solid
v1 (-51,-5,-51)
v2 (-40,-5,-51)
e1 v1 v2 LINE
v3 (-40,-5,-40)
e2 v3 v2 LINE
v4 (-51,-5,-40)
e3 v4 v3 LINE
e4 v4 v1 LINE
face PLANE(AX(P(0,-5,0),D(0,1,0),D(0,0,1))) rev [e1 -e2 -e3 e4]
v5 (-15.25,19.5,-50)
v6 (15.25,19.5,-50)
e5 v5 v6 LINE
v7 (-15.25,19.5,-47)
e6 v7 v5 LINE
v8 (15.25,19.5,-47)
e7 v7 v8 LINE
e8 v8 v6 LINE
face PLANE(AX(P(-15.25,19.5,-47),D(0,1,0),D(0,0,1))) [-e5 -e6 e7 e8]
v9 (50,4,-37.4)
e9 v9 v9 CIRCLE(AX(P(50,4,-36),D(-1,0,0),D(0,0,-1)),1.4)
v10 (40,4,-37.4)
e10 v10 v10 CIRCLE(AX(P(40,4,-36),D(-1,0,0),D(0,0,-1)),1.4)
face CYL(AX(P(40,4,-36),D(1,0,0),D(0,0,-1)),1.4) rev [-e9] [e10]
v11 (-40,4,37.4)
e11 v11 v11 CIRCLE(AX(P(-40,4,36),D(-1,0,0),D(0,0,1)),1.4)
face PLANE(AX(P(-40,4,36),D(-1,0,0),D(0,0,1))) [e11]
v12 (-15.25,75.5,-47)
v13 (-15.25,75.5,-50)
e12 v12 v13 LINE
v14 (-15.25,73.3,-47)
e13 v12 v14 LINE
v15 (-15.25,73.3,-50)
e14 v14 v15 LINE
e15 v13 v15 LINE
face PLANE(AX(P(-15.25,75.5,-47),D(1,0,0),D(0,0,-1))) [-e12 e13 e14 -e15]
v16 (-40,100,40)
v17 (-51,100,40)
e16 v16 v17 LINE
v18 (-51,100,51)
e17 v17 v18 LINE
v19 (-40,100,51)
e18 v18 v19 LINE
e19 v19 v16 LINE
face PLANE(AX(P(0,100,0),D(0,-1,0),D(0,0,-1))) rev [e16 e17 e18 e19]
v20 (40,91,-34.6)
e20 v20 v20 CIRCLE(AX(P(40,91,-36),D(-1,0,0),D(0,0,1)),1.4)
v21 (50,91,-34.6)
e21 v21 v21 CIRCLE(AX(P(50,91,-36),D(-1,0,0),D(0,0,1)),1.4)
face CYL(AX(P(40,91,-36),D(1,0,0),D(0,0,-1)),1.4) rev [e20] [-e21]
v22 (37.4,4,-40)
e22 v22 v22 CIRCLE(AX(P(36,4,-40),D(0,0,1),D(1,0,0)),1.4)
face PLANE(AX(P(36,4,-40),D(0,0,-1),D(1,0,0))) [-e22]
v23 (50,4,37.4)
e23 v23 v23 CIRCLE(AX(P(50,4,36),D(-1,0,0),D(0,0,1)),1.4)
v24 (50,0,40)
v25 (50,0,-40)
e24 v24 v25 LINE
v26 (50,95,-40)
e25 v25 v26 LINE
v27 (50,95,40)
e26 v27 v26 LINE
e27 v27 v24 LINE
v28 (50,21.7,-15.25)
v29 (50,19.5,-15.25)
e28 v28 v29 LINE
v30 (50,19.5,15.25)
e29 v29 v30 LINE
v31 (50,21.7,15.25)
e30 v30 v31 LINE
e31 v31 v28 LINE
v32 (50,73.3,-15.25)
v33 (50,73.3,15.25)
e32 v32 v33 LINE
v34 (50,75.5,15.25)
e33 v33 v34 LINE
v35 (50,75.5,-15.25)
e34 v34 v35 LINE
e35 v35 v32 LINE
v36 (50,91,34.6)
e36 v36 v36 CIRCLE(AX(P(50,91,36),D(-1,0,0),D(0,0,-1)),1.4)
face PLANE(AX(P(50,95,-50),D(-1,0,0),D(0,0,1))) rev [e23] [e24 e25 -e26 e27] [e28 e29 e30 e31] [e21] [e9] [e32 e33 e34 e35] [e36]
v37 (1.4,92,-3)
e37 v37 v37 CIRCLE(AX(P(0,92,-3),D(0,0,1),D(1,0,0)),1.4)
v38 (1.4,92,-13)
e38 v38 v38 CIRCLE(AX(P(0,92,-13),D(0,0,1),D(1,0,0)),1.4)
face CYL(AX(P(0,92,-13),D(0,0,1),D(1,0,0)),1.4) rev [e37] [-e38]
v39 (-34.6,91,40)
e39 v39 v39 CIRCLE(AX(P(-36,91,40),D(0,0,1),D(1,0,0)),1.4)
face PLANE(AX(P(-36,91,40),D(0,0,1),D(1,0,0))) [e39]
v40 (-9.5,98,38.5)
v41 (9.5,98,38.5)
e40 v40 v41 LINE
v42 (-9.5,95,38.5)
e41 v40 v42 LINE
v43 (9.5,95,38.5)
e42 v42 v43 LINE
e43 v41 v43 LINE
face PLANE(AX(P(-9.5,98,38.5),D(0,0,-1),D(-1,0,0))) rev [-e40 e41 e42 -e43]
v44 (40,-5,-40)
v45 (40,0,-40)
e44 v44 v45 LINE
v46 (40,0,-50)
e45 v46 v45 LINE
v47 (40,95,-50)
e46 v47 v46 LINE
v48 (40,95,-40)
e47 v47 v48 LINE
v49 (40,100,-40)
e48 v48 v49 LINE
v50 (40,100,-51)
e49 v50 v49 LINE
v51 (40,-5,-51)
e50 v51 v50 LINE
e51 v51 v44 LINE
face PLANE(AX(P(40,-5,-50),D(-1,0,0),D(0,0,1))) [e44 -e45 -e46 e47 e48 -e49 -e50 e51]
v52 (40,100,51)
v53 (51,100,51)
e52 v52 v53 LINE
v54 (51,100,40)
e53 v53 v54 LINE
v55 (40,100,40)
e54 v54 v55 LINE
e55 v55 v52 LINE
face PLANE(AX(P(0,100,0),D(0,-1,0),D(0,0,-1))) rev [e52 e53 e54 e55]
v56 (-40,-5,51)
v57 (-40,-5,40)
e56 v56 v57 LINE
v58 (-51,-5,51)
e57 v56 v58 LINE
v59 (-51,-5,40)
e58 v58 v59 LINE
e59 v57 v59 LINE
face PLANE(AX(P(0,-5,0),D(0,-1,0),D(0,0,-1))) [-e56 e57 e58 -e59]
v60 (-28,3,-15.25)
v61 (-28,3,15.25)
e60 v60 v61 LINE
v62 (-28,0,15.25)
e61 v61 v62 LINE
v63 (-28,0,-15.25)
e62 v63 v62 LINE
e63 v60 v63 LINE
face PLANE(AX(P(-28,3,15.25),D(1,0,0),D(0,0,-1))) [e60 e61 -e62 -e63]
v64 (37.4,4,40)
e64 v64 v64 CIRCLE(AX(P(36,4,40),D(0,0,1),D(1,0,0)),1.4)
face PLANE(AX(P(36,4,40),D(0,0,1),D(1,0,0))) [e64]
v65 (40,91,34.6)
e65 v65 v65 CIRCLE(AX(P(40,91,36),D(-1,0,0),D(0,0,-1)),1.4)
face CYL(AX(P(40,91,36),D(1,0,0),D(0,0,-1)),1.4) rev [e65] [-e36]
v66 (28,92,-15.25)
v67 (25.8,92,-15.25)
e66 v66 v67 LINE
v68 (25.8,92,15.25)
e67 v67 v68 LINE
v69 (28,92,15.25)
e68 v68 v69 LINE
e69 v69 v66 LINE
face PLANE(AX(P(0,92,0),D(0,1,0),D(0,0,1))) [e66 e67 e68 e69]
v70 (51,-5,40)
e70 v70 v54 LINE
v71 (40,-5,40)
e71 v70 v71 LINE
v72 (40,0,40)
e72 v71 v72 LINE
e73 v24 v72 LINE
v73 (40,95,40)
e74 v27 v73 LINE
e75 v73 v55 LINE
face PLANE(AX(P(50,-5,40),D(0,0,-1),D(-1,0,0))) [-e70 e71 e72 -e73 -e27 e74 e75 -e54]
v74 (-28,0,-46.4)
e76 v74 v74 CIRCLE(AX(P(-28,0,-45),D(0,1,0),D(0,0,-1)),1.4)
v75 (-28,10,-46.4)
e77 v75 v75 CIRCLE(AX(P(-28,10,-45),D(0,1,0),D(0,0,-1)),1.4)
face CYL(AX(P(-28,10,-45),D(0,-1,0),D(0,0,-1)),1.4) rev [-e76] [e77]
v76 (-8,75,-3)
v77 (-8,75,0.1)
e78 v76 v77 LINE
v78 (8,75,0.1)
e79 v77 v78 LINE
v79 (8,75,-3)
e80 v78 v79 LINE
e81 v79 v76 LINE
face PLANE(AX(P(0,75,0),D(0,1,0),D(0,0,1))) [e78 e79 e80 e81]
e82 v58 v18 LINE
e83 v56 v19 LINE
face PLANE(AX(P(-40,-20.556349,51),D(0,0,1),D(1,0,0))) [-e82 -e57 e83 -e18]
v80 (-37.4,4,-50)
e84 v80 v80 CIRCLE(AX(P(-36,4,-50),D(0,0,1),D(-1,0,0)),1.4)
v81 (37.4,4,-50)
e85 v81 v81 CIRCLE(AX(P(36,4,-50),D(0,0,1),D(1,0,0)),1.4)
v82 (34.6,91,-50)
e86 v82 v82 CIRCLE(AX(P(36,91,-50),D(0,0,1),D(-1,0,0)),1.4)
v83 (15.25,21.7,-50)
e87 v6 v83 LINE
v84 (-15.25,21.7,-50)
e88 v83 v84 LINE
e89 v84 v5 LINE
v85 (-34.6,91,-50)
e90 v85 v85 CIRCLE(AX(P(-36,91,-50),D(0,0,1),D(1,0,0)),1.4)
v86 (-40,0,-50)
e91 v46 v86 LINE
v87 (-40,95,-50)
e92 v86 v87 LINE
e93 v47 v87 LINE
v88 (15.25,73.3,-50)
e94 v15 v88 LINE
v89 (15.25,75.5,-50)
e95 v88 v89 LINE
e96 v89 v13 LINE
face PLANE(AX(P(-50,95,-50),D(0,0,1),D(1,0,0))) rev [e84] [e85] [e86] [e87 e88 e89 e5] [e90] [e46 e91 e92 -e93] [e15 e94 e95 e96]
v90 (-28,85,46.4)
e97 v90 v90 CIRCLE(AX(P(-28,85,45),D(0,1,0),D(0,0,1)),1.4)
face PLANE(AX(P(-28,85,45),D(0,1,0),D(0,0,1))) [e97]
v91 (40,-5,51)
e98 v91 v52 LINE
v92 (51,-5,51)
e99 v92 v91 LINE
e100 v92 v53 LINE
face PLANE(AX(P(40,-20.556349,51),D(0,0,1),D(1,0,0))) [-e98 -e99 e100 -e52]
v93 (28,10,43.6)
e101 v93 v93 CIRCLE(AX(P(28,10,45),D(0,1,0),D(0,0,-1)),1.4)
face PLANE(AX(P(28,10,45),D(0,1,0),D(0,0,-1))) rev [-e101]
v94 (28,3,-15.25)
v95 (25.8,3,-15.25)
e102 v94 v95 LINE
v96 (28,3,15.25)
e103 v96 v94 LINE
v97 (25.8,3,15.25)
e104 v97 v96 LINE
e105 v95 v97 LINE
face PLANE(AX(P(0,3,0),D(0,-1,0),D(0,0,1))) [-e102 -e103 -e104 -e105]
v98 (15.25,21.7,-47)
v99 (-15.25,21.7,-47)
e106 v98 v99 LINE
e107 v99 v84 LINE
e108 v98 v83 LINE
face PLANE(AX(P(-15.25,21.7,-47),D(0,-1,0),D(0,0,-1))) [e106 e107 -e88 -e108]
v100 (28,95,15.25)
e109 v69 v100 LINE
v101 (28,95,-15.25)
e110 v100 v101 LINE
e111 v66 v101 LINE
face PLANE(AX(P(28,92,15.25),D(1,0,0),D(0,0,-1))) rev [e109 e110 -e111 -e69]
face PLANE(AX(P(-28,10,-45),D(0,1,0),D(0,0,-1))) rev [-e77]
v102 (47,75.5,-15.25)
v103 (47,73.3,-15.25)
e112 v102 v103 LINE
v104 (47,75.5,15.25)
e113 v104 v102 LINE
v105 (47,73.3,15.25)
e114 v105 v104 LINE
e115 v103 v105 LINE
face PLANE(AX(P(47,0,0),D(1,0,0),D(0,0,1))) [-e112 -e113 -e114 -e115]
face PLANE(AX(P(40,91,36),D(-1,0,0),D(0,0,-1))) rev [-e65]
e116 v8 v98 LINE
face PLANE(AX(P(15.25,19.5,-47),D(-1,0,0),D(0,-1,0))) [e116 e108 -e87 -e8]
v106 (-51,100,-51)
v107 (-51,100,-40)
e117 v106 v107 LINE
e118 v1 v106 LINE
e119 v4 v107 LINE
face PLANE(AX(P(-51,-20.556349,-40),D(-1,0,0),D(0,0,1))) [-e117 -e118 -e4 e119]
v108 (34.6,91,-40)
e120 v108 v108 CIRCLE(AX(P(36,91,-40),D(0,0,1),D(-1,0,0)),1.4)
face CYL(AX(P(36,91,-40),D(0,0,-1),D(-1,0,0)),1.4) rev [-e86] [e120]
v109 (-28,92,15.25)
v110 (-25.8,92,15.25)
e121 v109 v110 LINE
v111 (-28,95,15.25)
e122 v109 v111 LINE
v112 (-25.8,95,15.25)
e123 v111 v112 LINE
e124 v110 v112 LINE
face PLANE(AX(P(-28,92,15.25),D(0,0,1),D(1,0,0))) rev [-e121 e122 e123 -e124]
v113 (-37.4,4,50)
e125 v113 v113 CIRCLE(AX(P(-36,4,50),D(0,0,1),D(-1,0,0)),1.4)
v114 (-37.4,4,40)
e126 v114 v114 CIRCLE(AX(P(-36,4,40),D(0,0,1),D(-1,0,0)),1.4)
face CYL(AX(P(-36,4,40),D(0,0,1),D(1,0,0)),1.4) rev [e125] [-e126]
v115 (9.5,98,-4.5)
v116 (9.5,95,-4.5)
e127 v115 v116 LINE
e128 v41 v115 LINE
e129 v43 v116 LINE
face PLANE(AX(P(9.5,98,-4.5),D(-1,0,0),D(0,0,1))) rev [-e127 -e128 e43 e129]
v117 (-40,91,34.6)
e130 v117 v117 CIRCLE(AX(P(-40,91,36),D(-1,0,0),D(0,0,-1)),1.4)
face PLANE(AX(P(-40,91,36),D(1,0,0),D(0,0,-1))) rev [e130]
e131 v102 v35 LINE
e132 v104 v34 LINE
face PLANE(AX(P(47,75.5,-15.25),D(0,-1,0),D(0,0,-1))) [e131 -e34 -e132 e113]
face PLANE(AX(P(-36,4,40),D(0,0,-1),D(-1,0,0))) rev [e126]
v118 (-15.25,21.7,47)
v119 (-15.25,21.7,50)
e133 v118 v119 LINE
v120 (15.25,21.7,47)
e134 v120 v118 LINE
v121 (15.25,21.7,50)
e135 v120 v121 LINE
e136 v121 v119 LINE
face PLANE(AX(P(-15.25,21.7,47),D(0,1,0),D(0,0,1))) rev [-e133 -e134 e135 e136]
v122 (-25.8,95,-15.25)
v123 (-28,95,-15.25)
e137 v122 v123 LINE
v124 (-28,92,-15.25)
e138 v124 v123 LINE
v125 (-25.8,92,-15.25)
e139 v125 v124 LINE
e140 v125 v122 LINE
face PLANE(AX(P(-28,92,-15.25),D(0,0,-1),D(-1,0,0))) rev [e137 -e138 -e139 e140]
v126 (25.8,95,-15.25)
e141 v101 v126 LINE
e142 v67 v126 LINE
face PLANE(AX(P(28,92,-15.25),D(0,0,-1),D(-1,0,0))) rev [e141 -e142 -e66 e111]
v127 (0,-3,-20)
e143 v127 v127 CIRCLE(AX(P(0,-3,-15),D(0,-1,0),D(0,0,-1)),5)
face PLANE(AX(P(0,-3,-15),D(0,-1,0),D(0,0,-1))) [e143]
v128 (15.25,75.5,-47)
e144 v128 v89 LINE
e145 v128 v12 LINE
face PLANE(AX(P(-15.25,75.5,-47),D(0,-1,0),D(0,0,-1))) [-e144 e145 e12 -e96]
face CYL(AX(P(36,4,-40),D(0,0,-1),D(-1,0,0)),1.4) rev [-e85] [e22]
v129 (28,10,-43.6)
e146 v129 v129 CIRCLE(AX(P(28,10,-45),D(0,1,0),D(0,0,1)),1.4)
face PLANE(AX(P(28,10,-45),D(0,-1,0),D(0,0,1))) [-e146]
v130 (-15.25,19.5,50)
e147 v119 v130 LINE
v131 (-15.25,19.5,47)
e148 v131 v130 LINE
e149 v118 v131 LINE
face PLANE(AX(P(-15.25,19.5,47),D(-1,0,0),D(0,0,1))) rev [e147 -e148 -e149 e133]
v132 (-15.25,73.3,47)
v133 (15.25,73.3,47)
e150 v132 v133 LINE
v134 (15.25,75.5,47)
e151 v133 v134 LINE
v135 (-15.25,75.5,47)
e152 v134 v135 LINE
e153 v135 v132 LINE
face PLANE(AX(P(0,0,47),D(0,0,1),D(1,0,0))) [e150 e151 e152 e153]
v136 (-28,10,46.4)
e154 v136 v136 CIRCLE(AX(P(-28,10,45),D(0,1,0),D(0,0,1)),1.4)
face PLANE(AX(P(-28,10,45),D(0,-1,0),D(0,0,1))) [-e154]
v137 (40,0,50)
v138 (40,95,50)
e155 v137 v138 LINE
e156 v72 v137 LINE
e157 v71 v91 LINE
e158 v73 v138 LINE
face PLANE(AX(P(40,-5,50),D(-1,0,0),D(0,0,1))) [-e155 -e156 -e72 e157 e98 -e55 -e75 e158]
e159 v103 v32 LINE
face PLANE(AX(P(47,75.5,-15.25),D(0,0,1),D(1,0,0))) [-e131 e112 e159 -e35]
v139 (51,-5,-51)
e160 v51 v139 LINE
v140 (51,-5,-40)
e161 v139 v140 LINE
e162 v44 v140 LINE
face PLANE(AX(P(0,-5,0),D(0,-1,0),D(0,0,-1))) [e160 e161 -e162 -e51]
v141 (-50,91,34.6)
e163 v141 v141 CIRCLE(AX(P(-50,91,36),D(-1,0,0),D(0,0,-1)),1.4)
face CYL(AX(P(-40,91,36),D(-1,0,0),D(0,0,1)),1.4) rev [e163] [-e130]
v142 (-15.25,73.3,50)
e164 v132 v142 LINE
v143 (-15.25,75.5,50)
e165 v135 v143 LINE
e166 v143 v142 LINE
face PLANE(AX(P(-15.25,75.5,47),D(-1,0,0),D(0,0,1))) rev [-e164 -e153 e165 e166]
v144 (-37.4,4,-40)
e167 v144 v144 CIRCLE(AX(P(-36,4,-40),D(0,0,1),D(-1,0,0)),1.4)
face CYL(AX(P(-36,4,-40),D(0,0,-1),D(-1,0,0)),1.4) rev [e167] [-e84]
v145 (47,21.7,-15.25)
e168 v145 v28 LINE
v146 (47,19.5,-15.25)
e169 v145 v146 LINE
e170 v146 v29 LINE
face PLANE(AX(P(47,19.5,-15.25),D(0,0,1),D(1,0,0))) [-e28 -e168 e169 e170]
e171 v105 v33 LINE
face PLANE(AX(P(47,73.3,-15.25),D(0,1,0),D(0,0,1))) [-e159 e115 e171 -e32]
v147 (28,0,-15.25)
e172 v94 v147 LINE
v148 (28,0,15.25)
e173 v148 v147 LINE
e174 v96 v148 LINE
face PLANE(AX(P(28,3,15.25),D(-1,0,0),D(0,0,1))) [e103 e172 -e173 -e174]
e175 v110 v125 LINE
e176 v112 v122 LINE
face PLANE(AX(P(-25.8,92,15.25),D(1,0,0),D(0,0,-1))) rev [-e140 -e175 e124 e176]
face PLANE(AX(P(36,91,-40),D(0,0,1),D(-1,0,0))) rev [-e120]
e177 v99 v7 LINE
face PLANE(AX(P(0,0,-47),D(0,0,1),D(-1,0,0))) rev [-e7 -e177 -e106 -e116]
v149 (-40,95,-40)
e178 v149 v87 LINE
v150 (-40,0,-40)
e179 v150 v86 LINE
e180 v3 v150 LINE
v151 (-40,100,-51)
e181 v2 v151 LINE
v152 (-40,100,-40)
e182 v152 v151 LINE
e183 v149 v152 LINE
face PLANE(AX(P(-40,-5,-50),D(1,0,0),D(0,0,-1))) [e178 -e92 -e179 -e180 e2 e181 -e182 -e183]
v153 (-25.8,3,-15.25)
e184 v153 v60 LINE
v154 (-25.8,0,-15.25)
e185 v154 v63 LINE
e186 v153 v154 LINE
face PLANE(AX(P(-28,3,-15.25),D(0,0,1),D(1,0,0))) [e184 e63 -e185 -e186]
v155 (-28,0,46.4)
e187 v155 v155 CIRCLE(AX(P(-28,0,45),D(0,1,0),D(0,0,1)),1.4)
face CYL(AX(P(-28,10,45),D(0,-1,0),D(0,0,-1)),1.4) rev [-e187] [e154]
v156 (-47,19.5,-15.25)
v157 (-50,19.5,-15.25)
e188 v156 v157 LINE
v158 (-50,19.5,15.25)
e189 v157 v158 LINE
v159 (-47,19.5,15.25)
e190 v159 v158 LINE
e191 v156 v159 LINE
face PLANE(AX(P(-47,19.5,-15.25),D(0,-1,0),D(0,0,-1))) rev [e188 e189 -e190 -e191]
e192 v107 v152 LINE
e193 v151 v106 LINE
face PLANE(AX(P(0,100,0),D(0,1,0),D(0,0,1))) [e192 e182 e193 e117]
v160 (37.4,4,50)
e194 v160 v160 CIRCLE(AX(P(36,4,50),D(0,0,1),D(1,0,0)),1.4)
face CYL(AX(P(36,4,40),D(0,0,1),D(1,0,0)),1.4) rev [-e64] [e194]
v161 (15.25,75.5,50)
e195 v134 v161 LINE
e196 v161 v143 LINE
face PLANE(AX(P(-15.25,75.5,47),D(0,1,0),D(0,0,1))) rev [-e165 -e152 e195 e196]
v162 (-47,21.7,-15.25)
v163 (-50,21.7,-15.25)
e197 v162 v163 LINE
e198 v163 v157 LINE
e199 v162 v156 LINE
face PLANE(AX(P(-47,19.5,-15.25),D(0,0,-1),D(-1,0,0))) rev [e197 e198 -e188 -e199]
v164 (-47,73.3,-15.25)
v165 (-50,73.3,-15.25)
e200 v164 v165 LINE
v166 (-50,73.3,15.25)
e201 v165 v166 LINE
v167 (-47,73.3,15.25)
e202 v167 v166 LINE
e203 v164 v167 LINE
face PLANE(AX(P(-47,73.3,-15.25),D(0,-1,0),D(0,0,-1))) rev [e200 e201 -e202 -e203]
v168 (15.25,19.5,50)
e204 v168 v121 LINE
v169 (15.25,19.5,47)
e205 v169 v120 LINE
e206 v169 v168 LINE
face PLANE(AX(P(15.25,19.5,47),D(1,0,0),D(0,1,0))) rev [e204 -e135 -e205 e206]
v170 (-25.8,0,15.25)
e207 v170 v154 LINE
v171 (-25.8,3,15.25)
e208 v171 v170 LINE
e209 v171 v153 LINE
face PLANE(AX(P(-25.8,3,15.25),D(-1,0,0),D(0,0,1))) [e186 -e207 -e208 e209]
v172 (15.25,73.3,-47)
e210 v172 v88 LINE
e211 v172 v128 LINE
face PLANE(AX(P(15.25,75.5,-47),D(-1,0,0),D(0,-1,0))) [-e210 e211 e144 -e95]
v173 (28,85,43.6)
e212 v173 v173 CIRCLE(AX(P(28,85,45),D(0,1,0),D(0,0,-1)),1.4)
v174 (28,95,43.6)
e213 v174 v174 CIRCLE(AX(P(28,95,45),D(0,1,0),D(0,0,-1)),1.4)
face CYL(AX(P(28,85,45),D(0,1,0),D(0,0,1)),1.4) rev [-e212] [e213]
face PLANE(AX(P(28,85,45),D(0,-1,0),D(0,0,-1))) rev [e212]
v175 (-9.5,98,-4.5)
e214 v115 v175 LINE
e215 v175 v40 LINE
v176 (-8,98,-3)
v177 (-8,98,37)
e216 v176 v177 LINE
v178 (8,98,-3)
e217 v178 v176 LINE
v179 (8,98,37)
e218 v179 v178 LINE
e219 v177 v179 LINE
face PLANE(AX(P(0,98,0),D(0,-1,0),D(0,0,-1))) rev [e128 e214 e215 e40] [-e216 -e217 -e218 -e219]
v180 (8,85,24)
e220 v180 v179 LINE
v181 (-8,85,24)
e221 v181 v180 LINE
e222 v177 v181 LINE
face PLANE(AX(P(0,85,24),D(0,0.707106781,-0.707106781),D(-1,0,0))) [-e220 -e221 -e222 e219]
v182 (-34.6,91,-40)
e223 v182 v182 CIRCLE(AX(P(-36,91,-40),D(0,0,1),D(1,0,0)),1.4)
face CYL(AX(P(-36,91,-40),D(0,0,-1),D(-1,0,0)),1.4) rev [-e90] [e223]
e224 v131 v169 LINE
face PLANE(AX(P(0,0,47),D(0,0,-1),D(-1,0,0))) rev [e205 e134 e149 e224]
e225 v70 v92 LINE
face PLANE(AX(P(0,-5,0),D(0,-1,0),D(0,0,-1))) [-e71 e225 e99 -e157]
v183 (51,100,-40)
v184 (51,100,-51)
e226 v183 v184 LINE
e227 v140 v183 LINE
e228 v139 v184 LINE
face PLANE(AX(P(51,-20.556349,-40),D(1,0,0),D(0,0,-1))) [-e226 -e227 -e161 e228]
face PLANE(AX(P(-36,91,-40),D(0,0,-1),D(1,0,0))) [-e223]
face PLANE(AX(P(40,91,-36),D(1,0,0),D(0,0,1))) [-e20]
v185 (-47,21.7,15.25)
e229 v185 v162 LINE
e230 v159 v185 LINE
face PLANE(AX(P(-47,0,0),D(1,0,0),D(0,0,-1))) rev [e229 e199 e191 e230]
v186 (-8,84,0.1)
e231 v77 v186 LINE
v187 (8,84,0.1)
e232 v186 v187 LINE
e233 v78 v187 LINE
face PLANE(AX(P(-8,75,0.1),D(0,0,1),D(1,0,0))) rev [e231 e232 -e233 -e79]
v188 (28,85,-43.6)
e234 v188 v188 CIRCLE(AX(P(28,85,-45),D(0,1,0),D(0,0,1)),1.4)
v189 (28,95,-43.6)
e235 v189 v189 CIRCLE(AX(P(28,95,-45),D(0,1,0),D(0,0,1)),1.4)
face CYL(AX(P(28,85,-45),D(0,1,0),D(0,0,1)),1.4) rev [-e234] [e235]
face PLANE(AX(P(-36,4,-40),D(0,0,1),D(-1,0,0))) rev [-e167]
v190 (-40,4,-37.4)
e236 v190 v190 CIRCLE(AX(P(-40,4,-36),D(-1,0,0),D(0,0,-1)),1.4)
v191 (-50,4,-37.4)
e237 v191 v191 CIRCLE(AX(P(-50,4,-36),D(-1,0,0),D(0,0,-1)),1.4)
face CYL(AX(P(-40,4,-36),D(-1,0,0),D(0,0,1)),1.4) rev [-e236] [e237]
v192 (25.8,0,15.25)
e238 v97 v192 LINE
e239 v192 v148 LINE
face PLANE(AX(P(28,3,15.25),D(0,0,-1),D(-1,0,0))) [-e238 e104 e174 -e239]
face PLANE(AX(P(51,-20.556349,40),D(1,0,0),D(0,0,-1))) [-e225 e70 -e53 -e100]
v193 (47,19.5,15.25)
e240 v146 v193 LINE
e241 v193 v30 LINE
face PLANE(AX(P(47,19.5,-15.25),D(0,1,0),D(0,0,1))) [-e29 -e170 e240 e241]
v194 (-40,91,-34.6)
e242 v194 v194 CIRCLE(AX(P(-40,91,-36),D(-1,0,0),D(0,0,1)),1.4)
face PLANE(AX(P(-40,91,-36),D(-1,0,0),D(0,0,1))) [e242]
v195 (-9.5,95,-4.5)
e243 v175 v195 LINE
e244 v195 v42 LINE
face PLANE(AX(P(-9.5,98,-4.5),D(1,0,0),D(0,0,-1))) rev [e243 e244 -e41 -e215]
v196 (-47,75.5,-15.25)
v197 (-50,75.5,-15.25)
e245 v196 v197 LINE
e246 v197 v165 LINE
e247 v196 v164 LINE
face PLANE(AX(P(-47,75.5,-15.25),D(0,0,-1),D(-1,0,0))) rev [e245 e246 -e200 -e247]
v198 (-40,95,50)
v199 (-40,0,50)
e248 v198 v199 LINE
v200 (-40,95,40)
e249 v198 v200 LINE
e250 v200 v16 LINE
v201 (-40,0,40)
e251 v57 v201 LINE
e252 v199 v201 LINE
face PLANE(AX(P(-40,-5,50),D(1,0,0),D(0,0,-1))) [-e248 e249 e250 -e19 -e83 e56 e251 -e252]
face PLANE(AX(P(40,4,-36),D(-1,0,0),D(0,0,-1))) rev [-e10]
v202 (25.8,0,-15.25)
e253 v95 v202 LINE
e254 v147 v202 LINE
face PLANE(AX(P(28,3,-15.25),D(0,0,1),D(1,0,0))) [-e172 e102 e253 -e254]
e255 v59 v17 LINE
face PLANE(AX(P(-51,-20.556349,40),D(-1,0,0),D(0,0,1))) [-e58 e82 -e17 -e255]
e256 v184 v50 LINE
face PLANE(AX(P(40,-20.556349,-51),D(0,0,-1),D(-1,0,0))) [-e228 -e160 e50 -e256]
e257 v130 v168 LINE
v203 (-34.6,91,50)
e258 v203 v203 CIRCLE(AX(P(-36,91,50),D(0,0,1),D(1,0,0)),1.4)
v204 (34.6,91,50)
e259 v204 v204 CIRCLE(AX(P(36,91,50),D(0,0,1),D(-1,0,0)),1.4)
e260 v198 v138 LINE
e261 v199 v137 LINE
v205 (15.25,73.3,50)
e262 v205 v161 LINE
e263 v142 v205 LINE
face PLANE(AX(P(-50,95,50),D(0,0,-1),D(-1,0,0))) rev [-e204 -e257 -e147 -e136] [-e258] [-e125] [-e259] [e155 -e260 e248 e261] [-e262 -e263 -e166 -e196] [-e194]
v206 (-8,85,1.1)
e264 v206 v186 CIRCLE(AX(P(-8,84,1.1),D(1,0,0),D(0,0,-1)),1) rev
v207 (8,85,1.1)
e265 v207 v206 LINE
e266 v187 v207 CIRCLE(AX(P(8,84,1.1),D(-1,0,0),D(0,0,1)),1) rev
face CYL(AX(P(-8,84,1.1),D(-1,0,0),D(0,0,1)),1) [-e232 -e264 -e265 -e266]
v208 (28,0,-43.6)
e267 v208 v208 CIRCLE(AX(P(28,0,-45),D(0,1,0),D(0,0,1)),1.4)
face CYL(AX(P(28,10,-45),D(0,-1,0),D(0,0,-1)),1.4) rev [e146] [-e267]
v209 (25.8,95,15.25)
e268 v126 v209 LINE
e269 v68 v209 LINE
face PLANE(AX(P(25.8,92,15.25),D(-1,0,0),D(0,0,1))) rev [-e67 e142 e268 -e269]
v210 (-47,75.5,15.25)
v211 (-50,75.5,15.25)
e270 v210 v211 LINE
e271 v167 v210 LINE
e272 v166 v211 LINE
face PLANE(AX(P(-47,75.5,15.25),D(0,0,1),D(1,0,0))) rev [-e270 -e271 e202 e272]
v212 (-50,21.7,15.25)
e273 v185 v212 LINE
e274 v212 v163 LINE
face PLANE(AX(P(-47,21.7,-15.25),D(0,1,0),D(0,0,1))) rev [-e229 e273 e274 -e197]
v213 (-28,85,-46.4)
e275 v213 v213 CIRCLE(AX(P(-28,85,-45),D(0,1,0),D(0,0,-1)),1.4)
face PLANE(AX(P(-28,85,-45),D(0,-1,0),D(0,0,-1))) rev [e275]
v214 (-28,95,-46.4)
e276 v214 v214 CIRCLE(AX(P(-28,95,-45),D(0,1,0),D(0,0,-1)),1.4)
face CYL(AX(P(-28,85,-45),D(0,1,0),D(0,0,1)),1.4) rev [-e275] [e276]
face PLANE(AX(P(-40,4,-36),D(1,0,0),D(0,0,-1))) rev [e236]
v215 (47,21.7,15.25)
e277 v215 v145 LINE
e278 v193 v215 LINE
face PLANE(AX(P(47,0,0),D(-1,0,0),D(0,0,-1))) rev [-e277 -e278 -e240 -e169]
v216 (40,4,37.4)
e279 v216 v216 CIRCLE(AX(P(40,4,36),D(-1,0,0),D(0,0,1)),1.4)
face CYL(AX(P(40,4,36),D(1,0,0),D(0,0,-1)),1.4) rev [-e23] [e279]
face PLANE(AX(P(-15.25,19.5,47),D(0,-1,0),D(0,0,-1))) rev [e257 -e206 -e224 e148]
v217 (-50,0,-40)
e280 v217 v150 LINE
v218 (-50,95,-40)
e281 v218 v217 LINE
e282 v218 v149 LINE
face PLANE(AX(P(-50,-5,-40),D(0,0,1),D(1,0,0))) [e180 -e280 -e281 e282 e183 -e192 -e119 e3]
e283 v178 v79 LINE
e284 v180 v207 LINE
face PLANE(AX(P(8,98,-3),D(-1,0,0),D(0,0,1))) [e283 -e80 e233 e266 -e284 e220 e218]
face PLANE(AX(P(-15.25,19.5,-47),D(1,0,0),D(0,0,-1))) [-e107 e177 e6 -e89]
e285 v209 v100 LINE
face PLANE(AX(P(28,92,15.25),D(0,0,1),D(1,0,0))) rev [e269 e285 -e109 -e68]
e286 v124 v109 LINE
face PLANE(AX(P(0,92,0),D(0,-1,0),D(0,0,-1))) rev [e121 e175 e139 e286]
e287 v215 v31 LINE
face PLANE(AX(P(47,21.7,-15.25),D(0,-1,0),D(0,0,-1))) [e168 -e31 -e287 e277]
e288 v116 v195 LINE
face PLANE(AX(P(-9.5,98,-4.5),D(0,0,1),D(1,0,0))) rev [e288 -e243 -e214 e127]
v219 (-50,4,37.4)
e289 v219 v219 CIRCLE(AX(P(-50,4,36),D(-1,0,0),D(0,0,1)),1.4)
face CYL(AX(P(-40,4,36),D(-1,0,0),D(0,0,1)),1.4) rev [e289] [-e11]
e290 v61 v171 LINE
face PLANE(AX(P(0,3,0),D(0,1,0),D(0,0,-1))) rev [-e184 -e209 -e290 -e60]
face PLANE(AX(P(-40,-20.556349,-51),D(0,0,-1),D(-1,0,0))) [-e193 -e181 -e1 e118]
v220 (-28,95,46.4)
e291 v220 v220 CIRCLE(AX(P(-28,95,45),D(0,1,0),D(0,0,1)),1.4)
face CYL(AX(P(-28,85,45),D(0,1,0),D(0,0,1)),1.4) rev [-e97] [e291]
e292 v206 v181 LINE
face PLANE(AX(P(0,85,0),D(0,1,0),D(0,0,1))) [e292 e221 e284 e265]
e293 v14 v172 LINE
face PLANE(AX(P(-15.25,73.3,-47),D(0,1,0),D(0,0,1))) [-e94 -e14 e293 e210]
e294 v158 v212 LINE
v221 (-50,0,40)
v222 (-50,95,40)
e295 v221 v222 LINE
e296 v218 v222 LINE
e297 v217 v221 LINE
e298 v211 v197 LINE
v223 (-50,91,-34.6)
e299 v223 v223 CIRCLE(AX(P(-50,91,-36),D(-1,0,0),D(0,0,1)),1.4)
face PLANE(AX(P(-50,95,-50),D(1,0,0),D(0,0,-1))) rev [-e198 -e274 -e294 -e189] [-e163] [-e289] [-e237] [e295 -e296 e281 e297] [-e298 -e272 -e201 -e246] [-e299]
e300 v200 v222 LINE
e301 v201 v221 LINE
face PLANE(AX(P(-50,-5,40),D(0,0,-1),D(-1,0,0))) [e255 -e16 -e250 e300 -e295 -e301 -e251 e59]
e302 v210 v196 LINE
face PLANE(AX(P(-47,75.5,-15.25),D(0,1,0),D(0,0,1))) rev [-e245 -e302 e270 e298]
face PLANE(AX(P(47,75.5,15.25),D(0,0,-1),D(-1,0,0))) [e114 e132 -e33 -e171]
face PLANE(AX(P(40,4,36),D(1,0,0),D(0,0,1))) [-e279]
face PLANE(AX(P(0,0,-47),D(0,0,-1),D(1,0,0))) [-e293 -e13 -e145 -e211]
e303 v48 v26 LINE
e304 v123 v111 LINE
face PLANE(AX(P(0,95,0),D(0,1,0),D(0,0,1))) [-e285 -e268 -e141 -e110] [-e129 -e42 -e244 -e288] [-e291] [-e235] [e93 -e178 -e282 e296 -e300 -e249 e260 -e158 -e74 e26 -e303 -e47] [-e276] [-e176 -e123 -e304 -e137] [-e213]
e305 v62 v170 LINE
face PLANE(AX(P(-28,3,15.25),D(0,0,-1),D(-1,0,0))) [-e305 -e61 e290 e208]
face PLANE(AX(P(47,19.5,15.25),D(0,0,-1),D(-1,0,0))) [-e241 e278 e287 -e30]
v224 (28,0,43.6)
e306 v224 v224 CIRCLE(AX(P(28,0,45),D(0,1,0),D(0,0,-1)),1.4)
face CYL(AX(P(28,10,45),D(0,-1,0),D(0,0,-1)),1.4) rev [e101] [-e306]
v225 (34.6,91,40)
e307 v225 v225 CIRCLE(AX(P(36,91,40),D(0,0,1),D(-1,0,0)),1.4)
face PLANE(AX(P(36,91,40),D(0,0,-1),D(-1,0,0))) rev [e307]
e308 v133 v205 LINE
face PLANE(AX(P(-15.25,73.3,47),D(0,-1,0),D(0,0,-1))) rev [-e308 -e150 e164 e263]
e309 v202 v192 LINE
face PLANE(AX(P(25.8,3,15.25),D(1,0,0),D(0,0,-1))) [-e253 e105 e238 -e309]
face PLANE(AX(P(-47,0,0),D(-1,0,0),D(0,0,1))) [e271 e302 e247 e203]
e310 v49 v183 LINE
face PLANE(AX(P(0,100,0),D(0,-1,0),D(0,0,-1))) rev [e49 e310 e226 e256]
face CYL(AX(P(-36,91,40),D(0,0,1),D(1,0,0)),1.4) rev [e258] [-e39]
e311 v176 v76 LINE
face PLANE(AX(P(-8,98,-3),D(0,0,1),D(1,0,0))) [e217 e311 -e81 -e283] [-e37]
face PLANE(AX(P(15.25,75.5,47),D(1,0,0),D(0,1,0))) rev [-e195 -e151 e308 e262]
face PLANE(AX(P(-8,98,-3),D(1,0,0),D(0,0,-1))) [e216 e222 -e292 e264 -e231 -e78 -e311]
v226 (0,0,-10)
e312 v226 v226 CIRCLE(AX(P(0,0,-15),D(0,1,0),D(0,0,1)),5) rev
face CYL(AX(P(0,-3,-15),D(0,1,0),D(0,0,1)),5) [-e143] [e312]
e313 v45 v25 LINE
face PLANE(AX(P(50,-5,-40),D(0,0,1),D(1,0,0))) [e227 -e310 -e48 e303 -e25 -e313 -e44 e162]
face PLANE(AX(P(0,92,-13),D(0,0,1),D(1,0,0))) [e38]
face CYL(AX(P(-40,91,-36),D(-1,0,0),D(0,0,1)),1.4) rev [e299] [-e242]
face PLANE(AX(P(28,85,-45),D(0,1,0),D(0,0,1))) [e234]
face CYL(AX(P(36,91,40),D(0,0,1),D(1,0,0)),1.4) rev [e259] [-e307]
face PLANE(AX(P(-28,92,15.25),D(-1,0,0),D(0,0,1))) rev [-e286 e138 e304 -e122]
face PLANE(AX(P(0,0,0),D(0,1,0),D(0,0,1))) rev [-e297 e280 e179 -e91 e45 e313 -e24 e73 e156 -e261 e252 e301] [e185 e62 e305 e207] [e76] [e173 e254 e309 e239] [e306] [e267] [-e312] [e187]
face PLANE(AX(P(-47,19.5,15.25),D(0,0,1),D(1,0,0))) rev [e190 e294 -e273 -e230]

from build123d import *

# Parameters (mm, degrees)
SKETCH1_W           = 100
SKETCH1_H           = 100
BOSS_EXTRUDE1_DEPTH = 95
SKETCH2_W           = 10
SKETCH2_H           = 10
BOSS_EXTRUDE2_DEPTH = 105
SKETCH3_R           = 1.4
CUT_EXTRUDE1_DEPTH  = 10
SKETCH4_W           = 11
SKETCH4_H           = 11
BOSS_EXTRUDE3_DEPTH = 105
SKETCH5_R           = 1.4
CUT_EXTRUDE2_DEPTH  = 10
SKETCH6_R           = 1.4
CUT_EXTRUDE3_DEPTH  = 10
SKETCH7_W           = 19
SKETCH7_H           = 43
SKETCH7_W_2         = 16
SKETCH7_H_2         = 40
BOSS_EXTRUDE4_DEPTH = 3
SKETCH8_W           = 16
SKETCH8_H           = 40
CUT_EXTRUDE4_DEPTH  = 10
CHAMFER2_SIZE       = 13
SKETCH9_W           = 16
SKETCH9_H           = 3.1
CUT_EXTRUDE5_DEPTH  = 10
FILLET1_R           = 1
SKETCH10_R          = 1.4
CUT_EXTRUDE6_DEPTH  = 10
SKETCH11_R          = 5
BOSS_EXTRUDE5_DEPTH = 3
SKETCH12_W          = 30.5
SKETCH12_H          = 2.2
CUT_EXTRUDE7_DEPTH  = 3
SKETCH13_W          = 30.5
SKETCH13_H          = 2.2
CUT_EXTRUDE8_DEPTH  = 3
SKETCH14_W          = 2.2
SKETCH14_H          = 30.5
CUT_EXTRUDE9_DEPTH  = 3


with BuildPart() as part:
    # Sketch1 → Boss-Extrude1 (new body)
    with BuildSketch(Plane(origin=(0, 0, 0), x_dir=(1, 0, 0), z_dir=(0, 1, 0))):
        Rectangle(SKETCH1_W, SKETCH1_H)
    extrude(amount=BOSS_EXTRUDE1_DEPTH)

    # Sketch2 → Boss-Extrude2 (add)
    with BuildSketch(Plane(origin=(0, 100, 0), x_dir=(1, 0, 0), z_dir=(0, 1, 0))):
        with Locations((-45, 45)):
            Rectangle(SKETCH2_W, SKETCH2_H)
        with Locations((45, 45)):
            Rectangle(SKETCH2_W, SKETCH2_H)
        with Locations((45, -45)):
            Rectangle(SKETCH2_W, SKETCH2_H)
        with Locations((-45, -45)):
            Rectangle(SKETCH2_W, SKETCH2_H)
    extrude(amount=-BOSS_EXTRUDE2_DEPTH)

    # Sketch3 → Cut-Extrude1 (cut)
    with BuildSketch(Plane(origin=(0, 95, 0), x_dir=(1, 0, 0), z_dir=(0, 1, 0))):
        with Locations(Location((-28, -45, 0), (0, 0, 270))):
            Circle(SKETCH3_R)
        with Locations(Location((28, -45, 0), (0, 0, 90))):
            Circle(SKETCH3_R)
        with Locations(Location((28, 45, 0), (0, 0, 270))):
            Circle(SKETCH3_R)
        with Locations(Location((-28, 45, 0), (0, 0, 90))):
            Circle(SKETCH3_R)
    cut_extrude1 = extrude(amount=-CUT_EXTRUDE1_DEPTH, mode=Mode.SUBTRACT)

    # Sketch4 → Boss-Extrude3 (add)
    with BuildSketch(Plane(origin=(0, 100, 0), x_dir=(1, 0, 0), z_dir=(0, 1, 0))):
        with Locations((-45.5, 45.5)):
            Rectangle(SKETCH4_W, SKETCH4_H)
        with Locations((45.5, 45.5)):
            Rectangle(SKETCH4_W, SKETCH4_H)
        with Locations((45.5, -45.5)):
            Rectangle(SKETCH4_W, SKETCH4_H)
        with Locations((-45.5, -45.5)):
            Rectangle(SKETCH4_W, SKETCH4_H)
    extrude(amount=-BOSS_EXTRUDE3_DEPTH)

    # Sketch5 → Cut-Extrude2 (cut)
    with BuildSketch(Plane.XY.offset(50)):
        with Locations((-36, 91)):
            Circle(SKETCH5_R)
        with Locations(Location((36, 91, 0), (0, 0, 180))):
            Circle(SKETCH5_R)
        with Locations((36, 4)):
            Circle(SKETCH5_R)
        with Locations(Location((-36, 4, 0), (0, 0, 180))):
            Circle(SKETCH5_R)
    cut_extrude2 = extrude(amount=-CUT_EXTRUDE2_DEPTH, mode=Mode.SUBTRACT)

    # Mirror1: Cut-Extrude2 across plane
    add(cut_extrude2.mirror(Plane.XY), mode=Mode.SUBTRACT)

    # Sketch6 → Cut-Extrude3 (cut)
    with BuildSketch(Plane.ZY.offset(50)):
        with Locations((-36, 91)):
            Circle(SKETCH6_R)
        with Locations(Location((36, 91, 0), (0, 0, 180))):
            Circle(SKETCH6_R)
        with Locations((36, 4)):
            Circle(SKETCH6_R)
        with Locations(Location((-36, 4, 0), (0, 0, 180))):
            Circle(SKETCH6_R)
    cut_extrude3 = extrude(amount=-CUT_EXTRUDE3_DEPTH, mode=Mode.SUBTRACT)

    # Mirror2: Cut-Extrude3 across plane
    add(cut_extrude3.mirror(Plane(origin=(0, 0, 0), x_dir=(0, 0, 1), z_dir=(1, 0, 0))), mode=Mode.SUBTRACT)

    # Mirror3: Cut-Extrude1 across plane
    add(cut_extrude1.mirror(Plane.ZX.offset(47.5)), mode=Mode.SUBTRACT)

    # Sketch7 → Boss-Extrude4 (add)
    with BuildSketch(Plane(origin=(0, 95, 0), x_dir=(1, 0, 0), z_dir=(0, 1, 0))):
        with Locations((0, -17)):
            Rectangle(SKETCH7_W, SKETCH7_H)
        with Locations((0, -17)):
            Rectangle(SKETCH7_W_2, SKETCH7_H_2, mode=Mode.SUBTRACT)
    extrude(amount=BOSS_EXTRUDE4_DEPTH)

    # Sketch8 → Cut-Extrude4 (cut)
    with BuildSketch(Plane(origin=(0, 95, 0), x_dir=(1, 0, 0), z_dir=(0, 1, 0))):
        with Locations((0, -17)):
            Rectangle(SKETCH8_W, SKETCH8_H)
    extrude(amount=-CUT_EXTRUDE4_DEPTH, mode=Mode.SUBTRACT)

    # Chamfer2
    chamfer2_edges = [part.edges().sort_by_distance(p)[0] for p in [
        (0, 85, 37),
    ]]
    chamfer(chamfer2_edges, length=CHAMFER2_SIZE - 0.0001)  # a hair under: the kernel refuses the full size

    # Sketch9 → Cut-Extrude5 (cut)
    with BuildSketch(Plane(origin=(0, 85, 0), x_dir=(1, 0, 0), z_dir=(0, 1, 0))):
        with Locations((0, 1.45)):
            Rectangle(SKETCH9_W, SKETCH9_H)
    extrude(amount=-CUT_EXTRUDE5_DEPTH, mode=Mode.SUBTRACT)

    # Fillet1
    fillet1_edges = [part.edges().sort_by_distance(p)[0] for p in [
        (0, 85, 0.1),
    ]]
    fillet(fillet1_edges, radius=FILLET1_R)

    # Sketch10 → Cut-Extrude6 (cut)
    with BuildSketch(Plane.XY.offset(-3)):
        with Locations((0, 92)):
            Circle(SKETCH10_R)
    extrude(amount=-CUT_EXTRUDE6_DEPTH, mode=Mode.SUBTRACT)

    # Sketch11 → Boss-Extrude5 (add)
    with BuildSketch(Plane.XZ):
        with Locations(Location((0, -15, 0), (0, 0, 90))):
            Circle(SKETCH11_R)
    extrude(amount=BOSS_EXTRUDE5_DEPTH)

    # Sketch12 → Cut-Extrude7 (cut)
    with BuildSketch(Plane.ZY.offset(50)):
        with Locations((0, 74.4)):
            Rectangle(SKETCH12_W, SKETCH12_H)
        with Locations((0, 20.6)):
            Rectangle(SKETCH12_W, SKETCH12_H)
    cut_extrude7 = extrude(amount=-CUT_EXTRUDE7_DEPTH, mode=Mode.SUBTRACT)

    # Mirror4: Cut-Extrude7 across plane
    add(cut_extrude7.mirror(Plane(origin=(0, 0, 0), x_dir=(0, 0, 1), z_dir=(1, 0, 0))), mode=Mode.SUBTRACT)

    # Sketch13 → Cut-Extrude8 (cut)
    with BuildSketch(Plane.XY.offset(50)):
        with Locations((0, 74.4)):
            Rectangle(SKETCH13_W, SKETCH13_H)
        with Locations((0, 20.6)):
            Rectangle(SKETCH13_W, SKETCH13_H)
    cut_extrude8 = extrude(amount=-CUT_EXTRUDE8_DEPTH, mode=Mode.SUBTRACT)

    # Mirror5: Cut-Extrude8 across plane
    add(cut_extrude8.mirror(Plane.XY), mode=Mode.SUBTRACT)

    # Sketch14 → Cut-Extrude9 (cut)
    with BuildSketch(Plane(origin=(0, 95, 0), x_dir=(1, 0, 0), z_dir=(0, 1, 0))):
        with Locations((26.9, 0)):
            Rectangle(SKETCH14_W, SKETCH14_H)
        with Locations((-26.9, 0)):
            Rectangle(SKETCH14_W, SKETCH14_H)
    cut_extrude9 = extrude(amount=-CUT_EXTRUDE9_DEPTH, mode=Mode.SUBTRACT)

    # Mirror6: Cut-Extrude9 across plane
    add(cut_extrude9.mirror(Plane.ZX.offset(47.5)), mode=Mode.SUBTRACT)


solid = part.part
